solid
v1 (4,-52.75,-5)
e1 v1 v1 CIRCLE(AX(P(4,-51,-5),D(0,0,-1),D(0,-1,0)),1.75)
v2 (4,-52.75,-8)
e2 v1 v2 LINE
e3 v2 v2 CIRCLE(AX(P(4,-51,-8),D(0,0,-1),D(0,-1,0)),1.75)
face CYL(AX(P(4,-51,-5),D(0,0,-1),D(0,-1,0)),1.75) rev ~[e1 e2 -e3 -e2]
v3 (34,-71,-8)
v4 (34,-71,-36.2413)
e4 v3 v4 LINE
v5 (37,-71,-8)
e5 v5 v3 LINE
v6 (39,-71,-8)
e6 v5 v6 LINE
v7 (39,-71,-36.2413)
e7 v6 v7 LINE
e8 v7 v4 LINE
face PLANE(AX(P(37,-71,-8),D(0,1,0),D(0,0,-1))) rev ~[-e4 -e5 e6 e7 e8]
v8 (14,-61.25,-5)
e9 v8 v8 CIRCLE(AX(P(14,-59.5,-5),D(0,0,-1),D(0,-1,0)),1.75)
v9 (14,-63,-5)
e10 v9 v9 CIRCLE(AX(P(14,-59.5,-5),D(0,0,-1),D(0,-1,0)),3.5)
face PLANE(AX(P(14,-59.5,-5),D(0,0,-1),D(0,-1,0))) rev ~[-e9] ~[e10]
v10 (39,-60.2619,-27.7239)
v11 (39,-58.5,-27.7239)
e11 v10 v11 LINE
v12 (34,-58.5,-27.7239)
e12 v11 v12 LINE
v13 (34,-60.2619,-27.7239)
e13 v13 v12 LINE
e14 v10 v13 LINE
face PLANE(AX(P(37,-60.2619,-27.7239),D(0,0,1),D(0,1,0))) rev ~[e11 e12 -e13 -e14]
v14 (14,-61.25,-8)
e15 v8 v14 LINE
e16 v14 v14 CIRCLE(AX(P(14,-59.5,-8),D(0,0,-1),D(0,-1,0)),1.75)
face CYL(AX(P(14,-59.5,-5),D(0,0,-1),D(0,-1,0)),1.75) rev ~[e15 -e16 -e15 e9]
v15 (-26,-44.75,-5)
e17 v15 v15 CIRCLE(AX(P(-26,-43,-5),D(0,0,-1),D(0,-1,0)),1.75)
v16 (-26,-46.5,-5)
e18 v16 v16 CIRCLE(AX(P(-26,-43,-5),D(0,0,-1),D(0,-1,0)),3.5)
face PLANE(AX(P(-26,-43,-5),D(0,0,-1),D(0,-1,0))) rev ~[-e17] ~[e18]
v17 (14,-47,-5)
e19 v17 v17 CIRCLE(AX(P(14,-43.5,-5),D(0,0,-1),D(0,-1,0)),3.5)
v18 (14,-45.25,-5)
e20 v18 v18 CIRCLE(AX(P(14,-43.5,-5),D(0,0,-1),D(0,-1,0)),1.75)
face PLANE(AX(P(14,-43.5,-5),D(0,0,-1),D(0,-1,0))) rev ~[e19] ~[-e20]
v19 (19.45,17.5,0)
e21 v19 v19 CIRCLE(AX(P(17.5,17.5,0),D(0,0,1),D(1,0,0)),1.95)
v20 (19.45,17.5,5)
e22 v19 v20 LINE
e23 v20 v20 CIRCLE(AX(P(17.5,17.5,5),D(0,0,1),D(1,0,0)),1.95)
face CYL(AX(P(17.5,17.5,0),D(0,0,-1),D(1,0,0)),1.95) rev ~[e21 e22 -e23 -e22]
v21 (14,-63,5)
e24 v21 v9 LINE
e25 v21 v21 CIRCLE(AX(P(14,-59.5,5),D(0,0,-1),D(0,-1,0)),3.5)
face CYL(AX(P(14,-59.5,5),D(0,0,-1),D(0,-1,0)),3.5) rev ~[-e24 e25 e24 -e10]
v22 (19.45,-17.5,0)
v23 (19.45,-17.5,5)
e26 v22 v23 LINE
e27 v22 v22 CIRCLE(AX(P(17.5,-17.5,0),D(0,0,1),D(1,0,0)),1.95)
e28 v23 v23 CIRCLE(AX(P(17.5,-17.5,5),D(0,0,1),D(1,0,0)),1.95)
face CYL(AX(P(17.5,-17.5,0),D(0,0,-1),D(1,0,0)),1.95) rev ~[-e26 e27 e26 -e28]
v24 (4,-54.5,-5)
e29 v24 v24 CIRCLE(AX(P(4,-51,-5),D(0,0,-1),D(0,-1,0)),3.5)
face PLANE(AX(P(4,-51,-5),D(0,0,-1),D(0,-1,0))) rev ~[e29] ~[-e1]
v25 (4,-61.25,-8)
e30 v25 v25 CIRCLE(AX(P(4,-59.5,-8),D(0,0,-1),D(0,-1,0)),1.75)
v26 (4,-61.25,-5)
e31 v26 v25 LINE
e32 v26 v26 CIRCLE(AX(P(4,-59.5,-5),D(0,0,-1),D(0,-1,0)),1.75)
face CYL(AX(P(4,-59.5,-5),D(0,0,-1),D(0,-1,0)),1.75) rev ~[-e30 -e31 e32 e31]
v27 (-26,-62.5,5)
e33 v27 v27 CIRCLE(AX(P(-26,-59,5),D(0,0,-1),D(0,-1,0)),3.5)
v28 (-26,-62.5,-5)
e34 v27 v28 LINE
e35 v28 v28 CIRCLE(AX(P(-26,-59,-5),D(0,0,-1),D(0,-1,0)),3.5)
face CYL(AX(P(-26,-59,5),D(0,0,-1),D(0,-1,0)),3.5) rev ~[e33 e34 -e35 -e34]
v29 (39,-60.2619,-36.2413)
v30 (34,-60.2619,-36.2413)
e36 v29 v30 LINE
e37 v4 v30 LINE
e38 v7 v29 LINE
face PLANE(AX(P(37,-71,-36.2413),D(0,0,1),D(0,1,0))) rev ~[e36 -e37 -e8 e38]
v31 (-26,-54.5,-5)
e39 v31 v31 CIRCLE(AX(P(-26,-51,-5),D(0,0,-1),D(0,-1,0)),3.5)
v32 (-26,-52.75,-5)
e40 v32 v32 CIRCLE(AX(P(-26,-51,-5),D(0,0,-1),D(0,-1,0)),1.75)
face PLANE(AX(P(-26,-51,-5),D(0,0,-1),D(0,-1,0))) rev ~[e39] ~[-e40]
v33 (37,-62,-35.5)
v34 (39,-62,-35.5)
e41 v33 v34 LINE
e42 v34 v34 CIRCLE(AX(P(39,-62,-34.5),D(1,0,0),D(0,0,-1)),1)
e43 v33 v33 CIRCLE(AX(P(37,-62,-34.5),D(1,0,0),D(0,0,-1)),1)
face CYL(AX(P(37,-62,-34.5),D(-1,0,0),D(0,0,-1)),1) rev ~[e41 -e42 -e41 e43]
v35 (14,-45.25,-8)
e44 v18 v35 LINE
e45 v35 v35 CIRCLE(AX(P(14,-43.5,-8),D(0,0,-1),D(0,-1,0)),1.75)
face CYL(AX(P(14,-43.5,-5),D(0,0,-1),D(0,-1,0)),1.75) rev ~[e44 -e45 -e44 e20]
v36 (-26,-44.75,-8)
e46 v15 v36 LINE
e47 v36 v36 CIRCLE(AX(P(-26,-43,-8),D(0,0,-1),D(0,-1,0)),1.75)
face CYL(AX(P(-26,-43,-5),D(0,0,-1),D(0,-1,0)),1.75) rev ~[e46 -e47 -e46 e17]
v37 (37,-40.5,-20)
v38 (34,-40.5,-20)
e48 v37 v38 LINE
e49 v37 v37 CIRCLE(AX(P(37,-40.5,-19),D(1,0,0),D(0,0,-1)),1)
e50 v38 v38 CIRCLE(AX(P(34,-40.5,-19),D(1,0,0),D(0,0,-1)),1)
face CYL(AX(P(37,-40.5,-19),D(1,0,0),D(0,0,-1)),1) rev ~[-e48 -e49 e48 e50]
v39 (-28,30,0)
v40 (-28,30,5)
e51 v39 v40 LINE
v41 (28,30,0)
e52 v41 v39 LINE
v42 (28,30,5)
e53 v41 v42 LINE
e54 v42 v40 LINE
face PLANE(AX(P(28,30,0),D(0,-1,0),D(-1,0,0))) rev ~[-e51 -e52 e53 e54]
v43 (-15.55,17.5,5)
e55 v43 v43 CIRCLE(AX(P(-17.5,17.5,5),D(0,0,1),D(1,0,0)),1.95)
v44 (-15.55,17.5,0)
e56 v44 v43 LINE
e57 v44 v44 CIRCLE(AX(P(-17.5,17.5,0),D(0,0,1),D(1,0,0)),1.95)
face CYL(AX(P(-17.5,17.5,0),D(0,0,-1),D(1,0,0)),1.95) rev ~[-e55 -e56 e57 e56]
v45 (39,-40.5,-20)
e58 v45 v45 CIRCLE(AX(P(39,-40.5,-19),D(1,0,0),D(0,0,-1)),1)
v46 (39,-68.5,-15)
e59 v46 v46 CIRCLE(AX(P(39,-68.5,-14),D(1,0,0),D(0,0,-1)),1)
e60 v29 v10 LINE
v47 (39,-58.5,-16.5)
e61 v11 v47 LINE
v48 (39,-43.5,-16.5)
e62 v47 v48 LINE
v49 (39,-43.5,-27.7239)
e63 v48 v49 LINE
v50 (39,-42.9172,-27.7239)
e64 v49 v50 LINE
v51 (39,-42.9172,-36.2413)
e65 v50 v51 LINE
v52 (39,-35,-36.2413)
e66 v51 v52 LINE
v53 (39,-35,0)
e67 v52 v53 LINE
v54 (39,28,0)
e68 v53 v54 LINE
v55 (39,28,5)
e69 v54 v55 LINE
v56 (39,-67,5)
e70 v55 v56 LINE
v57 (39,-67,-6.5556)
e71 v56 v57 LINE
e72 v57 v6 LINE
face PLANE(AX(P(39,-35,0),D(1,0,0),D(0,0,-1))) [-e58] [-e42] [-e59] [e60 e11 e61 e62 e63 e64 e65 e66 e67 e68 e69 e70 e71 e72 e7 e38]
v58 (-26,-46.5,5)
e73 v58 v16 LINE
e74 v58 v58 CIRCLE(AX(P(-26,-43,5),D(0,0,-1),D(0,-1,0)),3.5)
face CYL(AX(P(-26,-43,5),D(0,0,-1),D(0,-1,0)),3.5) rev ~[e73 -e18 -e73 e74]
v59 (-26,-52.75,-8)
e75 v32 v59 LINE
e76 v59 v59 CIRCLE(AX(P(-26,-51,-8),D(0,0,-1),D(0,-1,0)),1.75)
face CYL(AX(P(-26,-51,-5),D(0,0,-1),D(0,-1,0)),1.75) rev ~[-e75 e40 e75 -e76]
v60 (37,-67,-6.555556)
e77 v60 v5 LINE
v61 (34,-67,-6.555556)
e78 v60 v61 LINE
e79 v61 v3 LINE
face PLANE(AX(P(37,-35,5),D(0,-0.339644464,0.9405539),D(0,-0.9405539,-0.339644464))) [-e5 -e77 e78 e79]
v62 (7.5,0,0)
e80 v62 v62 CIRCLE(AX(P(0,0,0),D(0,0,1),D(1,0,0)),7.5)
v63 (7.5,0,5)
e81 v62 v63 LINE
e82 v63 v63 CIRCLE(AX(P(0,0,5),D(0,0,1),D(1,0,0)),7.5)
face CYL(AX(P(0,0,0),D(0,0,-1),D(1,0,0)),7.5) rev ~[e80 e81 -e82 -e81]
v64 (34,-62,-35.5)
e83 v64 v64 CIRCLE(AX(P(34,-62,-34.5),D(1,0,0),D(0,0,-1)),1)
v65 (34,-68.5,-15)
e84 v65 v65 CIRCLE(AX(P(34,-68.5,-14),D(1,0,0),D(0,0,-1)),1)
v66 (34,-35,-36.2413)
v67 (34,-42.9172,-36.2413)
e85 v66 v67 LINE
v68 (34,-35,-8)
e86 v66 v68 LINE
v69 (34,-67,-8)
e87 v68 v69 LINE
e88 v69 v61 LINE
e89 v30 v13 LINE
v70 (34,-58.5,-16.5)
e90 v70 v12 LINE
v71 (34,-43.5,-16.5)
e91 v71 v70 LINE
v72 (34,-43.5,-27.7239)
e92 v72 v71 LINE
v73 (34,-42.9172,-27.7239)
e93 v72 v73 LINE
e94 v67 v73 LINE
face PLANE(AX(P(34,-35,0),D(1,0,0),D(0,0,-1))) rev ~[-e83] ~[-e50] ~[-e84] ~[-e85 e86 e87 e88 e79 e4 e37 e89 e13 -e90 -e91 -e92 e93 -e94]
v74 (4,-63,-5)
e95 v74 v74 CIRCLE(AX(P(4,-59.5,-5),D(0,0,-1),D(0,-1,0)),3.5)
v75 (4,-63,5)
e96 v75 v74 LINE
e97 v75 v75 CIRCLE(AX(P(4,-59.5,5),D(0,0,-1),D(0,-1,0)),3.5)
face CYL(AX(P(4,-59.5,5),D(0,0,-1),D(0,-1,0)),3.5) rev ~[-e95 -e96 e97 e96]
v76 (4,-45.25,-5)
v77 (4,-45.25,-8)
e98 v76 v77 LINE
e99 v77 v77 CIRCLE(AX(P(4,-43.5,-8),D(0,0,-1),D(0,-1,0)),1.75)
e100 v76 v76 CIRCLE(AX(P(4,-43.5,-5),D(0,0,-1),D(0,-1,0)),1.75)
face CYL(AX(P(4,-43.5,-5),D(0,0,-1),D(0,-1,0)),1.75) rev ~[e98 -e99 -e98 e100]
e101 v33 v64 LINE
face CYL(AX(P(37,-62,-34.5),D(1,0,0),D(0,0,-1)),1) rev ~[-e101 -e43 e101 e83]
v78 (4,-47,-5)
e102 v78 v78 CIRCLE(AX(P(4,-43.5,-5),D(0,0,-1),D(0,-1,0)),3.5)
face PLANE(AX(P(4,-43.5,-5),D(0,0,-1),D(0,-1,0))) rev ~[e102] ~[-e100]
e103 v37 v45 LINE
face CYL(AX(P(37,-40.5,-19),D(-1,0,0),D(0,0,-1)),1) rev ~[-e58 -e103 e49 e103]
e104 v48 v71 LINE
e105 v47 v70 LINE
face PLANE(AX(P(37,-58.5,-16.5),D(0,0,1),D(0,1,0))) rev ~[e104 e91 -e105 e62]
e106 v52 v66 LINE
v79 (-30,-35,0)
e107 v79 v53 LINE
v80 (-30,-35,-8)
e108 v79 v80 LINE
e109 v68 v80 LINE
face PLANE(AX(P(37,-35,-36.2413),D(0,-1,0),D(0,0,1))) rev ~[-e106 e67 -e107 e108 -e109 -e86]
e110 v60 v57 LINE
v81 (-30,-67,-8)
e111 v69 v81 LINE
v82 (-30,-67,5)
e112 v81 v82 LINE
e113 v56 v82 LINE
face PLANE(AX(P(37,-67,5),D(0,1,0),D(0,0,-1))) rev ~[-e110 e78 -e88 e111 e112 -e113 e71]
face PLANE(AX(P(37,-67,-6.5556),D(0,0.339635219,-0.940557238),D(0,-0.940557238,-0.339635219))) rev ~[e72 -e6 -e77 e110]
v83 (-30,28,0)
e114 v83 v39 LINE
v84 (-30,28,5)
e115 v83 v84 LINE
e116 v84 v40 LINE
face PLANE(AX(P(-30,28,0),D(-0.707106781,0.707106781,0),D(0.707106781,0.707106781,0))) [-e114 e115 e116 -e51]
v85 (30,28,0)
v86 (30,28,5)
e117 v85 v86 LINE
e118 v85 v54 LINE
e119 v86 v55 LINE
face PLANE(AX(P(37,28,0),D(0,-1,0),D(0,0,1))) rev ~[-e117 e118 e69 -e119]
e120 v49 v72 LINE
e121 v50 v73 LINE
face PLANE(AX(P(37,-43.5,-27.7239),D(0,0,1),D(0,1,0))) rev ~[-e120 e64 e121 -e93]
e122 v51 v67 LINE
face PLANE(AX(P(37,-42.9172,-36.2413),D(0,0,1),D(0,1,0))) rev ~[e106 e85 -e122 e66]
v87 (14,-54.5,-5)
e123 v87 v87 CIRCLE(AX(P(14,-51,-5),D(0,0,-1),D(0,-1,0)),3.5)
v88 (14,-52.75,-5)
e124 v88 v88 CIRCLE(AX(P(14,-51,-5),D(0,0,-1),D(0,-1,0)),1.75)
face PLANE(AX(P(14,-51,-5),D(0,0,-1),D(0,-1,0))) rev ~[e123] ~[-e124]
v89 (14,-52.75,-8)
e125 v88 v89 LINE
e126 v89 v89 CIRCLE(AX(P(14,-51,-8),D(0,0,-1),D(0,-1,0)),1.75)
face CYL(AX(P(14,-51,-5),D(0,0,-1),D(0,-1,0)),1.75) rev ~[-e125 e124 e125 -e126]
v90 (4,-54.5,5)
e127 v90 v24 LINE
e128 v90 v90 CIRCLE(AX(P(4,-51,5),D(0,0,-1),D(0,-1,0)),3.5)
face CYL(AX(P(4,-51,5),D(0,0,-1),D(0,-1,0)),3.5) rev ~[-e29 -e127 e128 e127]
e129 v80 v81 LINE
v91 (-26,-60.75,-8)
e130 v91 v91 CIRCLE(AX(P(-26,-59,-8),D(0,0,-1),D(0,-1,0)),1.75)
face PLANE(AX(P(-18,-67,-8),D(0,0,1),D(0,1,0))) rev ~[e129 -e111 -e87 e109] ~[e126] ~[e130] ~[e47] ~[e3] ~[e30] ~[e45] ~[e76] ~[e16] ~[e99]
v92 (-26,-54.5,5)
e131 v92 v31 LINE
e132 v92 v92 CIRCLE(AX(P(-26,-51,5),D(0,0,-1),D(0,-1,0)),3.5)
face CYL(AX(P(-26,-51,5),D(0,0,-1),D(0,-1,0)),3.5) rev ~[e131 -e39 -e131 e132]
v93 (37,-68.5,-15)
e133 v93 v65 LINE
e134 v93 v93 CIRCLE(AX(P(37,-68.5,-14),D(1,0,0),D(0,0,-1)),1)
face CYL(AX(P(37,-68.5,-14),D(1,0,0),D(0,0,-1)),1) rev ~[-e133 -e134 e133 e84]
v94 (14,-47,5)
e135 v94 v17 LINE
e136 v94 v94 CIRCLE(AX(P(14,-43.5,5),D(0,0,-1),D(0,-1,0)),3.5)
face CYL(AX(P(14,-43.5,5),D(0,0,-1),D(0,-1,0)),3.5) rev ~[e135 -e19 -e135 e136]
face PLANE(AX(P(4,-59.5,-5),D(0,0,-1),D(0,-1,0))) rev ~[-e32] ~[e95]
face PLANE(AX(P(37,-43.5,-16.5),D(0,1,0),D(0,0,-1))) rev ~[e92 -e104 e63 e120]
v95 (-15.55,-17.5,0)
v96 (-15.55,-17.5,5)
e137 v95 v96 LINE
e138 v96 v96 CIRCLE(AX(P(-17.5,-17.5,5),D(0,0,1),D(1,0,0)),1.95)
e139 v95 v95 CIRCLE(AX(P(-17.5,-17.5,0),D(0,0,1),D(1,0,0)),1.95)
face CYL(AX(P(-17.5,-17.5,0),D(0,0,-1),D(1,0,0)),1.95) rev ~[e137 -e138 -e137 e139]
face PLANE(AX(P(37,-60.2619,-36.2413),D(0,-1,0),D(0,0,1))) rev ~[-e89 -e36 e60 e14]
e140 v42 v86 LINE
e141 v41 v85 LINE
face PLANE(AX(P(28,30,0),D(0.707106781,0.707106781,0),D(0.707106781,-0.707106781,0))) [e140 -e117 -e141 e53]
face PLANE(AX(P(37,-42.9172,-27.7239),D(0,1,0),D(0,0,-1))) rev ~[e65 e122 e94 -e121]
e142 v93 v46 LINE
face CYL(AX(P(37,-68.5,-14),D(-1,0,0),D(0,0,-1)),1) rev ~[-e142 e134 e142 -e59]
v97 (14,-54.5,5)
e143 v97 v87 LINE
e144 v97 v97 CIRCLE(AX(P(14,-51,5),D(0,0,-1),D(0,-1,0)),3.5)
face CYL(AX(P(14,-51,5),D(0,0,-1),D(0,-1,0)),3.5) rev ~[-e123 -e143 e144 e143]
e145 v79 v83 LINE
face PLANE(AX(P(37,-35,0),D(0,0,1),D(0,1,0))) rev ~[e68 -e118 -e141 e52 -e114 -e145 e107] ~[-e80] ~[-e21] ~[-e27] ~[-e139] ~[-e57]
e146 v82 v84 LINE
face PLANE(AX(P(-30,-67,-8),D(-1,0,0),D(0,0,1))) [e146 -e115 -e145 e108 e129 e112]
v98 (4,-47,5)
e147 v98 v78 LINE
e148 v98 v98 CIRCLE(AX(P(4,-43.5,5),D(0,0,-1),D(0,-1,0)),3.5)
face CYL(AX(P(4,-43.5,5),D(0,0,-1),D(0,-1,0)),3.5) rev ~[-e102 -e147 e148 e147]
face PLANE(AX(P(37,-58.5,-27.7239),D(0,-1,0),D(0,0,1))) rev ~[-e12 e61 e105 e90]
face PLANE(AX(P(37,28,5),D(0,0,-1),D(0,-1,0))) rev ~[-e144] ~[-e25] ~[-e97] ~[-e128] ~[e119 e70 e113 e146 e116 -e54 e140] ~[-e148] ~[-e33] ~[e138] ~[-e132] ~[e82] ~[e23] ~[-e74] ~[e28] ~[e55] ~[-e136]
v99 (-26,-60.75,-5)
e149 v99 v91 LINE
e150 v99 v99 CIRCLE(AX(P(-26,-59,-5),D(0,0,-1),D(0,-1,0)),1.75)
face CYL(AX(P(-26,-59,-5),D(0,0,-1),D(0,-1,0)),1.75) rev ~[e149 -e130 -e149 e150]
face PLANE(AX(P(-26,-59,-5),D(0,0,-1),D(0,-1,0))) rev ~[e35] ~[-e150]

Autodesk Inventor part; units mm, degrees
ref_plane "Work Plane1" through (-10, 0, 0) normal (0, 0, 1) x (1, 0, 0)
sketch "Sketch1" plane through (-10, 0, 0) normal (0, 0, 1) x (1, 0, 0)
  line L0 (38, 30) -> (40, 28) construction
  line L1 (38, 30) -> (-18, 30) construction
  line L2 (-20, 28) -> (-18, 30) construction
  line L3 (-20, 28) -> (-20, -28) construction
  line L4 (-18, -30) -> (-20, -28) construction
  line L5 (-18, -30) -> (38, -30) construction
  line L6 (40, -28) -> (38, -30) construction
  line L7 (40, -28) -> (40, 28) construction
  circle A0 centre (-7.5, 17.5) radius 1.95 construction
  circle A1 centre (-7.5, -17.5) radius 1.95 construction
  circle A2 centre (27.5, -17.5) radius 1.95 construction
  circle A3 centre (27.5, 17.5) radius 1.95 construction
  circle A4 centre (10, 0) radius 7.5 construction
  circle A5 centre (-5, -51) radius 1 construction
  circle A6 centre (25, -58.5) radius 1 construction
  circle A7 centre (25, -42.5) radius 1.0474 construction
  circle A8 centre (35, -42.5) radius 1 construction
  circle A9 centre (35, -51) radius 1 construction
  circle A10 centre (35, -58.5) radius 1 construction
  circle A11 centre (25, -51) radius 1 construction
  circle A12 centre (-5, -59) radius 1 construction
  circle A13 centre (-5, -43) radius 1 construction
  line L8 (-8, -67) -> (-8, -35) construction
  line L9 (-8, -67) -> (40, -67) construction
  line L10 (40, -35) -> (40, -67) construction
  line L11 (-8, -35) -> (40, -35) construction
  line L12 (38, 30) -> (40, 28)
  line L13 (38, 30) -> (-18, 30)
  line L14 (-20, 28) -> (-18, 30)
  line L15 (-20, 28) -> (-20, -28)
  line L16 (-18, -30) -> (-20, -28)
  line L17 (-18, -30) -> (38, -30)
  line L18 (40, -28) -> (38, -30)
  line L19 (40, -28) -> (40, 28)
  circle A14 centre (-7.5, 17.5) radius 1.95
  circle A15 centre (-7.5, -17.5) radius 1.95
  circle A16 centre (27.5, -17.5) radius 1.95
  circle A17 centre (27.5, 17.5) radius 1.95
  circle A18 centre (10, 0) radius 7.5
  line L20 (-8, -35) -> (40, -35)
  line L21 (-8, -67) -> (-8, -35)
  line L22 (-8, -67) -> (40, -67)
  line L23 (40, -35) -> (40, -67)
  line L24 (-18, -30) -> (-8, -35)
  line L25 (40, -35) -> (40, -28)
  line L26 (40, -67) -> (47, -67)
  line L27 (47, -67) -> (47, -35)
  line L28 (47, -35) -> (40, -35)
  line L29 (40, -35) -> (40, -67)
  line L30 (40, -35) -> (47, -35)
  line L31 (47, -35) -> (47, -25)
  line L32 (47, -25) -> (40, -25)
  line L33 (40, -25) -> (40, -35)
  circle A19 centre (-5, -43) radius 1.5
  circle A20 centre (-5, -51) radius 1.5
  circle A21 centre (-5, -59) radius 1.5
  circle A22 centre (25, -42.5) radius 1.5
  circle A23 centre (25, -51) radius 1.5
  circle A24 centre (25, -58.5) radius 1.5
  circle A25 centre (35, -42.5) radius 1.5
  circle A26 centre (35, -51) radius 1.5
  circle A27 centre (35, -58.5) radius 1.5
  point P0 (10, 0)
extrude "Extrusion1" add sketch "Sketch1" along normal blind 5 contours L12 L19 L18 L17 L16 L15 L14 L13 | L25 L20 L24 L17 L18
sketch "Sketch2" plane through (30, -35, 0) normal (1, 0, 0) x (0, 0, -1)
  line L0 (0, 0) -> (0, 63) projected
  line L1 (0, 63) -> (-5, 63) projected
  line L2 (-5, 0) -> (-5, 63) projected
  line L3 (0, 0) -> (-5, 0) projected
  circle A0 centre (24, -16) radius 6 projected
  line L4 (8, -32) -> (40, -32) projected
  line L5 (40, -32) -> (40, 0) projected
  line L6 (40, 0) -> (8, 0) projected
  line L7 (8, 0) -> (8, -32) projected
  line L8 (8, -32) -> (5, -32)
  line L9 (5, -32) -> (5, 0)
  line L10 (5, 0) -> (8, 0)
  line L11 (8, 0) -> (8, -32)
  line L12 (5, 0) -> (-5, 12.3524)
  line L13 (0, 0) -> (-5, 0) projected
  line L14 (5, 0) -> (-5, 0)
  line L15 (-5, 0) -> (-5, 12.3524)
  point P0 (0, 35)
  dimension "d11" = 3
ref_plane "Work Plane2" through (-18, -67, -25) normal (-1, 0, 0) x (0, 0, 1)
extrude "Extrusion2" add sketch "Sketch2" against normal up to surface (48 mm away) contours L10 L7 L8 L9
sketch "Sketch4" plane through (30, -35, 0) normal (1, 0, 0) x (0, 0, -1)
  line L0 (0, 63) -> (-5, 63) projected
  line L1 (0, 0) -> (-5, 0) projected
  line L2 (-5, 0) -> (-5, 63) projected
  line L3 (0, 0) -> (0, 63) projected
  point P0 (0, 35)
ref_plane "Work Plane3" through (37, -80.7499, -30.1921) normal (-1, 0, 0) x (0, -0.417504, 0.9086751)
extrude "Extrusion4" add sketch "Sketch4" along normal up to surface (7 mm away)
sketch "Sketch5" plane through (37, -35, 0) normal (1, 0, 0) x (0, 0, -1)
  line L0 (0, 0) -> (-5, 0) construction
  line L1 (8, 0) -> (8, -32) construction
  circle A0 centre (14, -33.5) radius 1 construction
  circle A1 centre (34, -33.5) radius 1 construction
  circle A2 centre (19, -5.5) radius 1 construction
  line L2 (21.4305, -36) -> (8, -36) construction
  line L3 (-5, 0) -> (0, 0) projected
  line L4 (-5, 0) -> (8, -36)
  line L5 (8, -36) -> (36.2413, -36)
  line L6 (36.2413, -36) -> (36.2413, -25.2619)
  line L7 (36.2413, -25.2619) -> (27.7239, -25.2619)
  line L8 (27.7239, -25.2619) -> (27.7239, 0)
  line L9 (27.7239, 0) -> (0, 0)
  line L10 (0, 0) -> (-5, 0)
  circle A3 centre (24, -16) radius 2.6486 construction
  line L11 (31.5, -8.5) -> (16.5, -8.5)
  line L12 (16.5, -8.5) -> (16.5, -23.5)
  line L13 (16.5, -23.5) -> (31.5, -23.5)
  line L14 (31.5, -23.5) -> (31.5, -8.5)
  line L15 (31.5, -8.5) -> (16.5, -23.5) construction
  line L16 (16.5, -8.5) -> (31.5, -23.5) construction
  circle A4 centre (34.5, -27) radius 1 construction
  line L17 (27.7239, 0) -> (36.2413, 0)
  line L18 (36.2413, 0) -> (36.2413, -7.9172)
  line L19 (36.2413, -7.9172) -> (27.7239, -7.9172)
  line L20 (27.7239, -7.9172) -> (27.7239, 0)
  point P0 (0, 35)
  point P1 (27.7239, -23.5)
  point P2 (27.7239, -8.5)
  dimension "d38" = 15
  dimension "d39" = 15
extrude "Extrusion5" add sketch "Sketch5" against normal blind 3 contours L3 L9 L8 L11 L12 L13 L7 L6 L5 L4 | L17 L18 L19 L8
ref_plane "Work Plane4" through (37, -71, -27) normal (0, -1, 0) x (1, 0, 0)
sketch "Sketch8" plane through (37, 28, 5) normal (1, 0, 0) x (0, 0, -1)
  circle A0 centre (19, -96.5) radius 1 projected
  line L0 (16, -99) -> (41.7, -99) projected
  circle A1 centre (39.5, -90) radius 1 projected
  circle A2 centre (24, -68.5) radius 1 projected
  point P0 (5, -28)
extrude "Extrusion8" cut sketch "Sketch8" against normal through all
sketch "Sketch9" plane through (-18, -67, -5) normal (-1, 0, 0) x (0, 0, 1)
  line L0 (-3, 0) -> (0, 0) construction
  line L1 (0, 0) -> (0, 32) construction
  line L2 (-3, 0) -> (-3, 32) construction
  line L3 (0, 32) -> (-3, 32) construction
  line L4 (-3, 0) -> (10, 32) construction
  line L5 (5, 32) -> (10, 32) construction
  line L6 (10, 32) -> (0, 32) construction
  line L7 (0, 32) -> (10, 32)
  line L8 (10, 32) -> (10, 0)
  line L9 (10, 0) -> (0, 0)
  line L10 (0, 0) -> (0, 32)
  line L11 (-3, 32) -> (0, 32)
  line L12 (0, 32) -> (0, 0)
  line L13 (0, 0) -> (-3, 0)
  line L14 (-3, 0) -> (-3, 32)
  point P0 (5, 67)
extrude "Extrusion9" add sketch "Sketch9" against normal up to surface (55 mm away)
sketch "Sketch11" plane through (-10, 0, 5) normal (0, 0, 1) x (1, 0, 0)
  circle A0 centre (10, 0) radius 7.5 projected
  circle A1 centre (27.5, 17.5) radius 1.95 projected
  circle A2 centre (27.5, -17.5) radius 1.95 projected
  circle A3 centre (-7.5, -17.5) radius 1.95 projected
  circle A4 centre (-7.5, 17.5) radius 1.95 projected
  line L0 (-18, -30) -> (-8, -35) projected
  line L1 (-8, -67) -> (-8, -35) projected
  line L2 (-8, -67) -> (47, -67) projected
  line L3 (47, 28) -> (47, -67) projected
  line L4 (40, 28) -> (47, 28) projected
  line L5 (40, 28) -> (38, 30) projected
  line L6 (38, 30) -> (-18, 30) projected
  line L7 (-18, 30) -> (-20, 28) projected
  line L8 (-20, 28) -> (-20, -28) projected
  line L9 (-20, -28) -> (-18, -30) projected
  point P0 (10, 0)
extrude "Extrusion11" [suppressed]
sketch "Sketch12" plane through (37, -35, 0) normal (1, 0, 0) x (0, 0, -1)
  circle A0 centre (19, -5.5) radius 1 projected
  circle A1 centre (14, -33.5) radius 1 projected
  circle A2 centre (34.5, -27) radius 1 projected
  line L0 (0, 0) -> (0, 63) projected
  line L1 (0, 63) -> (-5, 63) projected
  line L2 (-5, -32) -> (6.5556, -32) projected
  line L3 (6.5556, -32) -> (8, -36) projected
  line L4 (8, -36) -> (36.2413, -36) projected
  line L5 (36.2413, -36) -> (36.2413, -25.2619) projected
  line L6 (36.2413, -25.2619) -> (27.7239, -25.2619) projected
  line L7 (27.7239, -25.2619) -> (27.7239, -23.5) projected
  line L8 (27.7239, -23.5) -> (16.5, -23.5) projected
  line L9 (16.5, -23.5) -> (16.5, -8.5) projected
  line L10 (16.5, -8.5) -> (27.7239, -8.5) projected
  line L11 (27.7239, -8.5) -> (27.7239, -7.9172) projected
  line L12 (27.7239, -7.9172) -> (36.2413, -7.9172) projected
  line L13 (36.2413, -7.9172) -> (36.2413, 0) projected
  line L14 (36.2413, 0) -> (0, 0) projected
  line L15 (-5, 63) -> (-5, -32) projected
  point P0 (0, 35)
extrude "Extrusion12" add sketch "Sketch12" along normal blind 2
sketch "Sketch13" plane through (-18, -67, -8) normal (-1, 0, 0) x (0, 0, 1)
  line L0 (0, 0) -> (13, 0) projected
  line L1 (8, 32) -> (13, 32) projected
  line L2 (8, 32) -> (0, 32) projected
  line L3 (0, 32) -> (0, 0) projected
  line L4 (8, 39) -> (13, 39) projected
  line L5 (8, 32) -> (15, 32) projected
  line L6 (8, 39) -> (8, 32)
  line L7 (8, 32) -> (15, 32)
  line L8 (13, 0) -> (13, 32) projected
  line L9 (8, 32) -> (13, 32)
  line L10 (13, 32) -> (13, 39)
  line L11 (13, 39) -> (8, 39)
  line L12 (8, 39) -> (8, 32)
  point P0 (8, 67)
ref_plane "Work Plane5" through (-29, -67, -40) normal (-1, 0, 0) x (0, 0, 1)
extrude "Extrusion13" add sketch "Sketch13" along normal up to surface (12 mm away)
sketch "Sketch14" plane through (-10, 0, 5) normal (0, 0, 1) x (1, 0, 0)
  circle A0 centre (14, -43.5) radius 1 construction
  circle A1 centre (24, -43.5) radius 1 construction
  circle A2 centre (-16, -43) radius 1 construction
  circle A3 centre (-16, -59) radius 1 construction
  circle A4 centre (14, -51) radius 1 construction
  circle A5 centre (24, -51) radius 1 construction
  circle A6 centre (24, -59.5) radius 1 construction
  circle A7 centre (14, -59.5) radius 1.0474 construction
  circle A8 centre (-16, -51) radius 1 construction
  line L0 (-19, -35) -> (-19, -67) construction
  line L1 (-19, -35) -> (29, -35) construction
  line L2 (29, -67) -> (29, -35) construction
  line L3 (-19, -67) -> (29, -67) construction
  point P0 (10, 0)
hole "Hole1" at (14, -43.5, 5) at (14, -51, 5) at (14, -59.5, 5) at (4, -59.5, 5) at (4, -51, 5) at (4, -43.5, 5) at (-26, -43, 5) at (-26, -51, 5) at (-26, -59, 5) direction (0, 0, -1) diameter 3.5 depth 16 tip angle 118 counterbore diameter 7 counterbore depth 10
properties part number "10_Adapter_Laser_XY_left"
